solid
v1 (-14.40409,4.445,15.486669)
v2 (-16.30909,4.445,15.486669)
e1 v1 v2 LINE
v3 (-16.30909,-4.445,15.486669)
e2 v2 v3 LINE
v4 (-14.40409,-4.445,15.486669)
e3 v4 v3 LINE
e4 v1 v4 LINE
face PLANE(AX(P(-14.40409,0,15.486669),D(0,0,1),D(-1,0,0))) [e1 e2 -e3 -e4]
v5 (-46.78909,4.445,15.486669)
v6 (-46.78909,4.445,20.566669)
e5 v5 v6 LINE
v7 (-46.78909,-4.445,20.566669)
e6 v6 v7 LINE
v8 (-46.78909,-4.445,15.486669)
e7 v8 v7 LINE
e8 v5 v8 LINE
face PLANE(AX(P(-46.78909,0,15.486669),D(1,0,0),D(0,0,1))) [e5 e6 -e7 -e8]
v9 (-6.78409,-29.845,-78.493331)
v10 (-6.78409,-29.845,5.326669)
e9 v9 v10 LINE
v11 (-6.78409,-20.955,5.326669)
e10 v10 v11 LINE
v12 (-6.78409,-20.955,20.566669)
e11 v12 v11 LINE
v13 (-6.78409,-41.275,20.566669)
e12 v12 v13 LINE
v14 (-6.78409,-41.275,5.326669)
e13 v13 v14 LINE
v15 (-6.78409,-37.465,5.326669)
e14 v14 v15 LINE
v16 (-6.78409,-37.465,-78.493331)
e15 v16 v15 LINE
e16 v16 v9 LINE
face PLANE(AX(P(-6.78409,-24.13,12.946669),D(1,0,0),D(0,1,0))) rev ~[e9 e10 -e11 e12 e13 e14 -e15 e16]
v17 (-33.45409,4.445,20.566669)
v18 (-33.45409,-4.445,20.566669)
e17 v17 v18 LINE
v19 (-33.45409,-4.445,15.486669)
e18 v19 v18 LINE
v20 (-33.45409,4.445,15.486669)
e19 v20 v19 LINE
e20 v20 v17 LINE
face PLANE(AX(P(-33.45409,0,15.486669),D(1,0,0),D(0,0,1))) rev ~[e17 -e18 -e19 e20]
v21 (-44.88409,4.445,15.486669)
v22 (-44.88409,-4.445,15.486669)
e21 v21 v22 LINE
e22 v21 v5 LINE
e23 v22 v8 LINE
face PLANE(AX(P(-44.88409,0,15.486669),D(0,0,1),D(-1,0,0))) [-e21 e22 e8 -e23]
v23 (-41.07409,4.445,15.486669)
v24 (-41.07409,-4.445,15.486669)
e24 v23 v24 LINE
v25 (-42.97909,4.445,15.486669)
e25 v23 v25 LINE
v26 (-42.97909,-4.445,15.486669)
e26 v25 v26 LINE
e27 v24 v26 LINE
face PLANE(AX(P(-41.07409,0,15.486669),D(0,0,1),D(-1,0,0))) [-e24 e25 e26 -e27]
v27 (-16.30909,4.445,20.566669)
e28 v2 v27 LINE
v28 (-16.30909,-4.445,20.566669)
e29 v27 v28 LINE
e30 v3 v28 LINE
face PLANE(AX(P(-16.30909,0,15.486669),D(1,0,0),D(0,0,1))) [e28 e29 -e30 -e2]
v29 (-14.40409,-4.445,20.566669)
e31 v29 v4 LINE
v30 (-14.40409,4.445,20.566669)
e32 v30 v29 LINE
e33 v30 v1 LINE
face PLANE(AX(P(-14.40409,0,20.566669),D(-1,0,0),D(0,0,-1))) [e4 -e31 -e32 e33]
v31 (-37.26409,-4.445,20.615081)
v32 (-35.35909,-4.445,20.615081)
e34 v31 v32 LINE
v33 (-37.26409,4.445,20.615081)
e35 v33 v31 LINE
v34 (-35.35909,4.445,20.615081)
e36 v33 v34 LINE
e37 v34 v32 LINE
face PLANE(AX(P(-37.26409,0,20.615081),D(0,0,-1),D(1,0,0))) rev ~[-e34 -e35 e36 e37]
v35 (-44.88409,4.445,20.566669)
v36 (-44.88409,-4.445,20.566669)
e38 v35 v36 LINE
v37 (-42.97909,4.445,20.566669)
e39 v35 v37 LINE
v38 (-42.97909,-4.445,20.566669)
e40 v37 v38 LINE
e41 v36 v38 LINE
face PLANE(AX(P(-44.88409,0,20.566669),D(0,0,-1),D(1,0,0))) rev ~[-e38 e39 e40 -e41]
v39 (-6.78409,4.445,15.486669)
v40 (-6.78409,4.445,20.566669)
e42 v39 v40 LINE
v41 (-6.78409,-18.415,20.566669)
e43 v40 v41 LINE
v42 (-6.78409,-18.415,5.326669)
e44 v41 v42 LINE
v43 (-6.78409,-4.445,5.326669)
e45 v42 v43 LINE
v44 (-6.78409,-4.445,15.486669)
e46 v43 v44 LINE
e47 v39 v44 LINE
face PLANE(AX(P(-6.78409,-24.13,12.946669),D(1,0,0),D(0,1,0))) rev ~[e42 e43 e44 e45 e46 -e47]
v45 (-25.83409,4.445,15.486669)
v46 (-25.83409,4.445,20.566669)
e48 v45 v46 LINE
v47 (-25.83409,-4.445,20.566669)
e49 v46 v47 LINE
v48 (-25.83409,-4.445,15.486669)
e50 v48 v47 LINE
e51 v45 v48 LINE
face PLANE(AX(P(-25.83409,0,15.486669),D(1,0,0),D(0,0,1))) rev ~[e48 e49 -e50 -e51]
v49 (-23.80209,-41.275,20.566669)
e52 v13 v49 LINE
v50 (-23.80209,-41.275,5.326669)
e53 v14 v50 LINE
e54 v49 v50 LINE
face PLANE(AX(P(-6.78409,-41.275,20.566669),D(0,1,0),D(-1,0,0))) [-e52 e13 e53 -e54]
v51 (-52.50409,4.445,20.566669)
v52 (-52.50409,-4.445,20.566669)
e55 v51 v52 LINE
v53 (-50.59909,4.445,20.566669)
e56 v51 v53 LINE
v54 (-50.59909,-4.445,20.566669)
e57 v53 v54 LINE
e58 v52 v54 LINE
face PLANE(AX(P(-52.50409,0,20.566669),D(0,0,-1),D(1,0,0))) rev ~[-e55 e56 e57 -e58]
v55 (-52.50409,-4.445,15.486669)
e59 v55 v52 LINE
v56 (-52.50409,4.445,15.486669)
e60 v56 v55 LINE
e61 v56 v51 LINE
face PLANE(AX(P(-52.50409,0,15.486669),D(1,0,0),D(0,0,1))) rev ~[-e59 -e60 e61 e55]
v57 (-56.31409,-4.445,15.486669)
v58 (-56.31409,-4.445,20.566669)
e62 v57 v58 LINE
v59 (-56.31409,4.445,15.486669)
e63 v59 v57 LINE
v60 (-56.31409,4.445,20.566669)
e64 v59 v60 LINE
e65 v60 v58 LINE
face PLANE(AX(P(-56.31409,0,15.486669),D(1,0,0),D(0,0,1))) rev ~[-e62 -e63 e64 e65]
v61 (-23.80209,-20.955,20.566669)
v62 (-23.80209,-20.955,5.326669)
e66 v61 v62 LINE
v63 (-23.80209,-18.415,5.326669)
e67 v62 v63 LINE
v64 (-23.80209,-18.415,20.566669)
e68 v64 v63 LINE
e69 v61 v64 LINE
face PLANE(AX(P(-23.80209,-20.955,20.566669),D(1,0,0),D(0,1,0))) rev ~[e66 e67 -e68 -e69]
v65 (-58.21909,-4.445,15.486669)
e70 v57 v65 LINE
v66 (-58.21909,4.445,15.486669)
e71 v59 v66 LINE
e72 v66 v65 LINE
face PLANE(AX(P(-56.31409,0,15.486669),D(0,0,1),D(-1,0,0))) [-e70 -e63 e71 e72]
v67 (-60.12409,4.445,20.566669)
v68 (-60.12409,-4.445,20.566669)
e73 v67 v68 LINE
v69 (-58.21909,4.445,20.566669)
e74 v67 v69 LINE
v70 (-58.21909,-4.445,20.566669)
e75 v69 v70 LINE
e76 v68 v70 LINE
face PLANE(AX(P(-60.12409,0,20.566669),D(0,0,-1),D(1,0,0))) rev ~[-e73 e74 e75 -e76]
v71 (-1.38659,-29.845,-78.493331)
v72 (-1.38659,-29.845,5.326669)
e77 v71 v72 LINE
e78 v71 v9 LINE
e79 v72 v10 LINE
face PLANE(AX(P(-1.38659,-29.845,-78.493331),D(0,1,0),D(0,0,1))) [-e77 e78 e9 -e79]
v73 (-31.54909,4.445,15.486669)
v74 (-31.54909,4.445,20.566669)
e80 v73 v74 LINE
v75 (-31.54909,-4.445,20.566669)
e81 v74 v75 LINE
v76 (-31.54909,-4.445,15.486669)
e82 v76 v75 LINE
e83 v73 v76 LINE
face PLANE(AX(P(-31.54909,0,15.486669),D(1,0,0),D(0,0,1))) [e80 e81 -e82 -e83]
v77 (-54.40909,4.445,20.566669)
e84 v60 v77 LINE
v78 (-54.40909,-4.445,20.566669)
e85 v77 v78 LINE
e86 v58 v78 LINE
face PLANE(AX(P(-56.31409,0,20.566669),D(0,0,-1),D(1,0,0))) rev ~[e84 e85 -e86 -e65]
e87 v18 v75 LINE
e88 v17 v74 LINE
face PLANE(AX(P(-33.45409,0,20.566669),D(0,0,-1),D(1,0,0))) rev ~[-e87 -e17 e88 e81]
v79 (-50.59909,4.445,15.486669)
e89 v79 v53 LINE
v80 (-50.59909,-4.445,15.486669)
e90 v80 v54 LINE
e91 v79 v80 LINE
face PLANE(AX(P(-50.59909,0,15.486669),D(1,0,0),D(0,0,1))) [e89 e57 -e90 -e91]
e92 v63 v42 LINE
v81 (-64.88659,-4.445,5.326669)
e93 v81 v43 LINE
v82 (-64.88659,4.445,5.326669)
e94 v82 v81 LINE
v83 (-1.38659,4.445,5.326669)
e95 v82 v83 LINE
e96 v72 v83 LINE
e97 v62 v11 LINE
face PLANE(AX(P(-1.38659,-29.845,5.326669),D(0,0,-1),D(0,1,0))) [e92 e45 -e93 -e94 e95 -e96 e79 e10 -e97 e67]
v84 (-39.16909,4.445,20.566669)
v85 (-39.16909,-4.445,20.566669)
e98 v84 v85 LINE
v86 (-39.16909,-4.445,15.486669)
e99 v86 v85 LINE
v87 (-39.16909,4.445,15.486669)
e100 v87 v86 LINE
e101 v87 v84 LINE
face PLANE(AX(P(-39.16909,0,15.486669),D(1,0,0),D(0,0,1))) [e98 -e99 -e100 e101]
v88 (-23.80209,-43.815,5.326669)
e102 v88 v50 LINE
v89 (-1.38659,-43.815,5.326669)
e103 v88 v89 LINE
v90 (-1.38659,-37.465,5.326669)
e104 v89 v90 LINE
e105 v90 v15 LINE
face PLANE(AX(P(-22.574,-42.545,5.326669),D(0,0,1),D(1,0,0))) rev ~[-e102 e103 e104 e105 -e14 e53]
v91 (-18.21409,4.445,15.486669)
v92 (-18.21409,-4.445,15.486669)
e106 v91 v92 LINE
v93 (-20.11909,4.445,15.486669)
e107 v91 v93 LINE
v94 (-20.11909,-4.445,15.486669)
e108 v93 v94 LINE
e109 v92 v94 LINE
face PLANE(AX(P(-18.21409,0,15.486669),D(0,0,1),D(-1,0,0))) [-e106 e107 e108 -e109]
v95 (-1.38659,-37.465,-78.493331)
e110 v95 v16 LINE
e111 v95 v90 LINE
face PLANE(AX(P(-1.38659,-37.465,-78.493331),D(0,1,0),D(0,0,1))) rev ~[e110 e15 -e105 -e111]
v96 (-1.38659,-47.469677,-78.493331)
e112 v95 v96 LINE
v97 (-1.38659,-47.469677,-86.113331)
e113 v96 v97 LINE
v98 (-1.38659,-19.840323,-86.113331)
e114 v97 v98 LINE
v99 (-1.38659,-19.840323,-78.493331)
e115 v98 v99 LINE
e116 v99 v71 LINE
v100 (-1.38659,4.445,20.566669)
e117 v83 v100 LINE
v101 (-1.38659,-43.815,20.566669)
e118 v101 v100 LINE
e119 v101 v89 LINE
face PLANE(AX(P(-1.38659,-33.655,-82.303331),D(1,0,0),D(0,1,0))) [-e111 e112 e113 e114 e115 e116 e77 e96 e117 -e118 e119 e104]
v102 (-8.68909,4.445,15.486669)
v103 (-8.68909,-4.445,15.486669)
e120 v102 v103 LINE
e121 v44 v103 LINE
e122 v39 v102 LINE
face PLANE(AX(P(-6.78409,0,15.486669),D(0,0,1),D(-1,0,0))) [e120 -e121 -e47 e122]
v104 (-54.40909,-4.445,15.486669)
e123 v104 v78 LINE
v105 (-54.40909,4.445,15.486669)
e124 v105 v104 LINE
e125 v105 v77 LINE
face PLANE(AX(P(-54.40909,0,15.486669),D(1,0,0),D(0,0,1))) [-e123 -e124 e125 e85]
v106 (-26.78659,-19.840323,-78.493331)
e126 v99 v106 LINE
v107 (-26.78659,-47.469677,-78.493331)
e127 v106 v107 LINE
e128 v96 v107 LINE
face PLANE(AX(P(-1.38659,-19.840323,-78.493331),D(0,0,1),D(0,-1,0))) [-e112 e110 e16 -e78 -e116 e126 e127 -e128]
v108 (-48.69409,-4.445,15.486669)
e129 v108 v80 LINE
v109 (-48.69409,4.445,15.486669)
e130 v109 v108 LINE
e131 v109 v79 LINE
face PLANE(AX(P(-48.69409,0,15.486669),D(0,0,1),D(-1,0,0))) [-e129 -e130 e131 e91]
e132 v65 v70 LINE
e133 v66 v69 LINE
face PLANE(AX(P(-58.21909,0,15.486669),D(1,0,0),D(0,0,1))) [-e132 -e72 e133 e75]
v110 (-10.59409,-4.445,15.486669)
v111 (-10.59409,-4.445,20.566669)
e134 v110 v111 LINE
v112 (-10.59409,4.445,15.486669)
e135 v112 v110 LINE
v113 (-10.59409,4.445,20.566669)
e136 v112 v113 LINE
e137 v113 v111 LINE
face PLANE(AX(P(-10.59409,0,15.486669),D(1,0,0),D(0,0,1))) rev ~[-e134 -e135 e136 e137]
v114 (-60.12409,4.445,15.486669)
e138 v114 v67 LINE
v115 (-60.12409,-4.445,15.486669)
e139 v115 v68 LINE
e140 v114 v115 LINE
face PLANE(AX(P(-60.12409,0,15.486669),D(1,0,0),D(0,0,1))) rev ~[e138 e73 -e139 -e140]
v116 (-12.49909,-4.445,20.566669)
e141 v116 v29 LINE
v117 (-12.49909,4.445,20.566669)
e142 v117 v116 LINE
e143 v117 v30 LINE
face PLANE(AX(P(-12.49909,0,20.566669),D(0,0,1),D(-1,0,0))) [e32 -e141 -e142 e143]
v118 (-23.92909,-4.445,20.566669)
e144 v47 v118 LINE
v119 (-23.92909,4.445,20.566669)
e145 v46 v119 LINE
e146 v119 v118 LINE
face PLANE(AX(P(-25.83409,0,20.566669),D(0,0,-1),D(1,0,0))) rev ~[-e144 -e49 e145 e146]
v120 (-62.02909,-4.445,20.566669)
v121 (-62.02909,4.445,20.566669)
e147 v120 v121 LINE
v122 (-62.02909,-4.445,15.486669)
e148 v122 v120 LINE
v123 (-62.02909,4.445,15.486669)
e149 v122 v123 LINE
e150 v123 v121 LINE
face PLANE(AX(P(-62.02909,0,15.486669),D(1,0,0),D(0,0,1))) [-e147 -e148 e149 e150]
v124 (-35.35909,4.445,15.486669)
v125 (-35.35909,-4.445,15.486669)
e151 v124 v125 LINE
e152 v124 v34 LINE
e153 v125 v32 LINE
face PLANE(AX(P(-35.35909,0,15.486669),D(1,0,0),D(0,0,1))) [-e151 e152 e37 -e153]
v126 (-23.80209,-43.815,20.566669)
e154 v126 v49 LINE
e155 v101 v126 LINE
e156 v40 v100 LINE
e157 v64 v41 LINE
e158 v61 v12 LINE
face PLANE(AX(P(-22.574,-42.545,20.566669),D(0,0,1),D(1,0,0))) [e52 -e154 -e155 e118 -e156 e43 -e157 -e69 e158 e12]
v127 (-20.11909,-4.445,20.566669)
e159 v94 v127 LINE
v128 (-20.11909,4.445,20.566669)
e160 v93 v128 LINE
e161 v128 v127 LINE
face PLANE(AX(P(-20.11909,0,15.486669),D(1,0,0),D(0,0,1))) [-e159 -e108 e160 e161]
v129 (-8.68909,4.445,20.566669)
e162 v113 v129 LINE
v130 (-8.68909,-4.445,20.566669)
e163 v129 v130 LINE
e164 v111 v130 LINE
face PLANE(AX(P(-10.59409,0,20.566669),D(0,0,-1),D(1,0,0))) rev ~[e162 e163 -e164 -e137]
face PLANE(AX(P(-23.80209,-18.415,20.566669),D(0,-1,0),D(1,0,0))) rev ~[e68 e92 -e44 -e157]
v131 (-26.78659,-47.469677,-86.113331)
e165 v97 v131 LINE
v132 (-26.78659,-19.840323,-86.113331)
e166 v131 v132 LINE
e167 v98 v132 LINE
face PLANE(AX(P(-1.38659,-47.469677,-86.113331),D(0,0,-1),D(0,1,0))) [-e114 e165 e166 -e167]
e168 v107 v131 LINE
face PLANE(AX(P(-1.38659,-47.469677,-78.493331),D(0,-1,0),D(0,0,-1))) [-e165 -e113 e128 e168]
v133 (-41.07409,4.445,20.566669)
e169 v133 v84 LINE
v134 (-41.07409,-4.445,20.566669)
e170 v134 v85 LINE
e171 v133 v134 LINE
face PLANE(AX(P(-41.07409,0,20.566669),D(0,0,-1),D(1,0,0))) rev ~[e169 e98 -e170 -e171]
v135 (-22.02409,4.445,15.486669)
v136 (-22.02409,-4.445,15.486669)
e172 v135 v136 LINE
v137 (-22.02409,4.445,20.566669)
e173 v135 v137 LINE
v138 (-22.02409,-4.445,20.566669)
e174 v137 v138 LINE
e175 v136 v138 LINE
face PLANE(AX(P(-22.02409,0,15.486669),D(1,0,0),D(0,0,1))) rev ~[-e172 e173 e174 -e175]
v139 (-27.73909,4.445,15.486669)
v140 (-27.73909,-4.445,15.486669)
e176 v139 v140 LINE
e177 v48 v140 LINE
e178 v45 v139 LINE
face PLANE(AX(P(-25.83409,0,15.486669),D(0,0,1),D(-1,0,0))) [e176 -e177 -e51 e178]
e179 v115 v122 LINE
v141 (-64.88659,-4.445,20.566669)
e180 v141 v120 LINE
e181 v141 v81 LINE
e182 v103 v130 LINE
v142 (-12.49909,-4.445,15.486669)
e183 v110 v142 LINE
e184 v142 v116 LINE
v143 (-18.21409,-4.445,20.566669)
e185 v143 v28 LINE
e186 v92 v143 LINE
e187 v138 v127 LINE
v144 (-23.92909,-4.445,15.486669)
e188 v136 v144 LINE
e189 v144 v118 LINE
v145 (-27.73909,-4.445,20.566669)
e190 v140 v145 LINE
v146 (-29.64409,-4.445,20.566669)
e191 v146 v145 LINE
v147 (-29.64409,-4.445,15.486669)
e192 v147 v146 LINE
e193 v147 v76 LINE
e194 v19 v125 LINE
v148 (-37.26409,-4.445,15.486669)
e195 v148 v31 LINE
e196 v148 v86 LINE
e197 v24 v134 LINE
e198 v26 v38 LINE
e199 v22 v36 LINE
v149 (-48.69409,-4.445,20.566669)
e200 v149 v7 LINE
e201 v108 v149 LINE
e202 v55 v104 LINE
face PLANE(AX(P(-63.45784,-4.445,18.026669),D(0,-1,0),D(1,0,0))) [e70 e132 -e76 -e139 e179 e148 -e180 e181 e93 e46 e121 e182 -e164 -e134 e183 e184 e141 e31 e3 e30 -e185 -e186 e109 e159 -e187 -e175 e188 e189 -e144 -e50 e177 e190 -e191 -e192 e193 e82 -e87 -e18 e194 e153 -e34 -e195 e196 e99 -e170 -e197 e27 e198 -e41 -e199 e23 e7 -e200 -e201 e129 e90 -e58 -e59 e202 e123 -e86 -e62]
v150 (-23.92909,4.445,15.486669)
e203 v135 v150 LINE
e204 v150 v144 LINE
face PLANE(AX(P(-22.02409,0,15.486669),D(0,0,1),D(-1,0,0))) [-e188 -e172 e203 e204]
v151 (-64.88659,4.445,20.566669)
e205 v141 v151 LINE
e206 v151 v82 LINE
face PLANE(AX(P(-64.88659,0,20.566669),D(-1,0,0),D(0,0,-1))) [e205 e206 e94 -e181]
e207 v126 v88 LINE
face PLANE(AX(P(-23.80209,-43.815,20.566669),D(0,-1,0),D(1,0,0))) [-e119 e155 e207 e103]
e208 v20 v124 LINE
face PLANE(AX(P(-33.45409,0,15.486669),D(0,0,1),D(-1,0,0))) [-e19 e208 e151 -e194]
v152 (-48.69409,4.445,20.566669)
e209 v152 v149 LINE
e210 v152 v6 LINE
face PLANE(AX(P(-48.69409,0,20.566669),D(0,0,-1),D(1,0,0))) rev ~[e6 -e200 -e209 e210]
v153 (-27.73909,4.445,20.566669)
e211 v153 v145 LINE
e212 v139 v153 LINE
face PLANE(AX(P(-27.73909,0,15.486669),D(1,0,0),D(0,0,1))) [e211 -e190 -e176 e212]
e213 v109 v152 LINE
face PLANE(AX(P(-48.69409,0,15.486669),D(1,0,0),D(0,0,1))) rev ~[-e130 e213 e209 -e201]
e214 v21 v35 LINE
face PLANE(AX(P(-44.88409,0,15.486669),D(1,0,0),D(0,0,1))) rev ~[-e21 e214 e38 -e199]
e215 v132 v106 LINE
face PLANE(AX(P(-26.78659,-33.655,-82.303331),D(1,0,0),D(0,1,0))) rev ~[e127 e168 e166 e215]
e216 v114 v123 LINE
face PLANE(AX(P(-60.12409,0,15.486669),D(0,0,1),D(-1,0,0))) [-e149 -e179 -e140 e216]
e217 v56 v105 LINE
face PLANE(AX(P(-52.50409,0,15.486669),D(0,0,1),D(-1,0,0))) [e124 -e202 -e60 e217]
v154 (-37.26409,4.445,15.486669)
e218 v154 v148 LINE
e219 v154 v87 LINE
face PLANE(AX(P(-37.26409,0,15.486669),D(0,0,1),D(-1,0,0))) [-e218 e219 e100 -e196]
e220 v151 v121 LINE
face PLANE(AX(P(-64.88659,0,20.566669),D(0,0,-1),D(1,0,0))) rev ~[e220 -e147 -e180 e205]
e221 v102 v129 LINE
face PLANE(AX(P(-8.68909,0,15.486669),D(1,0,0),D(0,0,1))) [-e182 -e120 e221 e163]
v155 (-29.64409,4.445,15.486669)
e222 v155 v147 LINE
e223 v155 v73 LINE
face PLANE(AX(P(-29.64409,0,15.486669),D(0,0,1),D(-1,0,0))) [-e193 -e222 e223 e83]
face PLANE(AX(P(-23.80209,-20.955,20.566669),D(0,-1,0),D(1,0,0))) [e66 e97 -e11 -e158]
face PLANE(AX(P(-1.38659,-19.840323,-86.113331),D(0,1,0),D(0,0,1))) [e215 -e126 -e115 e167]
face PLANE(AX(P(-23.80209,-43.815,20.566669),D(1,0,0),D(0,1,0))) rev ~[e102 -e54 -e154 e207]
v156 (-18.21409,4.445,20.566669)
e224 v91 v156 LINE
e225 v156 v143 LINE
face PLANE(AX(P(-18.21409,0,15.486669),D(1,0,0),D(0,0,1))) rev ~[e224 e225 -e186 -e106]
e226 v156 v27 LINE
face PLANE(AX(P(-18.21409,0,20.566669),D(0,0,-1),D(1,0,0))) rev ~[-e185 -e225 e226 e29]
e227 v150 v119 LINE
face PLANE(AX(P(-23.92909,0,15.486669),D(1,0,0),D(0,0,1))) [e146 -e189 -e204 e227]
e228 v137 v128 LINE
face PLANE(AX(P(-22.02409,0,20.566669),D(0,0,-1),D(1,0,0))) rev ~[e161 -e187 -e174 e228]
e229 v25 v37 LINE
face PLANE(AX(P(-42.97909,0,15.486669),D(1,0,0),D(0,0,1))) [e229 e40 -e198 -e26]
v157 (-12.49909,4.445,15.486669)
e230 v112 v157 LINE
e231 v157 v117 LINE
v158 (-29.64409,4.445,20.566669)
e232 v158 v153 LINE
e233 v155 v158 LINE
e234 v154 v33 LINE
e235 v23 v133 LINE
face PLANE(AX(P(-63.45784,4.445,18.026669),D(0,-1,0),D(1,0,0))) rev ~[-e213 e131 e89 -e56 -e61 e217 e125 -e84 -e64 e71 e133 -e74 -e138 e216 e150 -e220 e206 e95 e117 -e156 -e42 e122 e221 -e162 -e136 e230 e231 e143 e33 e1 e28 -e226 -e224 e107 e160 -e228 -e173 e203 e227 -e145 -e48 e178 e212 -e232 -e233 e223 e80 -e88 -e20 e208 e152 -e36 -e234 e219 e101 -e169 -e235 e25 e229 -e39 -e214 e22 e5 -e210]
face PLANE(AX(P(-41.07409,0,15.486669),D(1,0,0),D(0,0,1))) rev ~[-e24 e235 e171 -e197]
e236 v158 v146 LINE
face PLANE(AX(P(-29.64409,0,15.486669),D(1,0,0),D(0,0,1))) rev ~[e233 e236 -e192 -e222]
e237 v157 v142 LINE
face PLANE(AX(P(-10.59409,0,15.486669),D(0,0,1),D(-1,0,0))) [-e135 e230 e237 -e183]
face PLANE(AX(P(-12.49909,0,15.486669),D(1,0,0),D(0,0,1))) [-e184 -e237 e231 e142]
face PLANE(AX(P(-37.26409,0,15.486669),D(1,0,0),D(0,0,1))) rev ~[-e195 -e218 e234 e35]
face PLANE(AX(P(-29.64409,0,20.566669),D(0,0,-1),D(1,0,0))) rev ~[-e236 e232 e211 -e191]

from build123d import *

# Parameters (mm, degrees)
F0_W     = 2.8575
F0_H     = 5.08
F0_W_2   = 1.905
F0_W_3   = 5.3975
F0_H_2   = 5.128411484
F1_DEPTH = 4.445
F2_W     = 7.62
F2_H     = 83.82
F3_DEPTH = 5.3975
F4_W     = 17.018
F4_H     = 2.54
F4_W_2   = 2.45618
F4_W_3   = 14.56182
F5_DEPTH = 15.24
F6_DEPTH = 25.4


# Not quite as in the source:
# - a feature names something its author has since deleted; it is built from what else it names


with BuildPart() as f1:
    # F0 (on Front) → F1 (new body, symmetric)
    with BuildSketch(Plane.XZ):
        with Locations((-63.4578398415, 18.0266693214)):
            Rectangle(F0_W, F0_H)
        Polygon((-62.0290898415, 15.4866693214), (-64.8865898415, 15.4866693214), (-64.8865898415, 5.3266693214), (-1.3865898415, 5.3266693214), (-1.3865898415, 15.4866693214), (-6.7840898415, 15.4866693214), (-8.6890898415, 15.4866693214), (-10.5940898415, 15.4866693214), (-12.4990898415, 15.4866693214), (-13.314443469, 15.4866693214), (-14.4040898415, 15.4866693214), (-16.3090898415, 15.4866693214), (-18.2140898415, 15.4866693214), (-20.1190898415, 15.4866693214), (-22.0240898415, 15.4866693214), (-23.9290898415, 15.4866693214), (-25.8340898415, 15.4866693214), (-27.7390898415, 15.4866693214), (-29.6440898415, 15.4866693214), (-31.5490898415, 15.4866693214), (-33.4540898415, 15.4866693214), (-35.3590898415, 15.4866693214), (-37.2640898415, 15.4866693214), (-39.1690898415, 15.4866693214), (-41.0740898415, 15.4866693214), (-42.9790898415, 15.4866693214), (-44.8840898415, 15.4866693214), (-46.7890898415, 15.4866693214), (-48.6940898415, 15.4866693214), (-50.5990898415, 15.4866693214), (-52.5040898415, 15.4866693214), (-54.4090898415, 15.4866693214), (-56.3140898415, 15.4866693214), (-58.2190898415, 15.4866693214), (-60.1240898415, 15.4866693214), align=None)
        with Locations((-59.1715898415, 18.0266693214)):
            Rectangle(F0_W_2, F0_H)
        with Locations((-4.0853398415, 18.0266693214)):
            Rectangle(F0_W_3, F0_H)
        with Locations((-55.3615898415, 18.0266693214)):
            Rectangle(F0_W_2, F0_H)
        with Locations((-9.6415898415, 18.0266693214)):
            Rectangle(F0_W_2, F0_H)
        with Locations((-51.5515898415, 18.0266693214)):
            Rectangle(F0_W_2, F0_H)
        Polygon((-13.314443469, 15.4866693214), (-12.4990898415, 15.4866693214), (-12.4990898415, 20.5666693214), (-13.314443469, 20.5666693214), (-14.4040898415, 20.5666693214), (-14.4040898415, 15.4866693214), align=None)
        with Locations((-47.7415898415, 18.0266693214)):
            Rectangle(F0_W_2, F0_H)
        with Locations((-43.9315898415, 18.0266693214)):
            Rectangle(F0_W_2, F0_H)
        with Locations((-17.2615898415, 18.0266693214)):
            Rectangle(F0_W_2, F0_H)
        with Locations((-40.1215898415, 18.0266693214)):
            Rectangle(F0_W_2, F0_H)
        with Locations((-21.0715898415, 18.0266693214)):
            Rectangle(F0_W_2, F0_H)
        with Locations((-36.3115898415, 18.0508750634)):
            Rectangle(F0_W_2, F0_H_2)
        with Locations((-24.8815898415, 18.0266693214)):
            Rectangle(F0_W_2, F0_H)
        with Locations((-32.5015898415, 18.0266693214)):
            Rectangle(F0_W_2, F0_H)
        with Locations((-28.6915898415, 18.0266693214)):
            Rectangle(F0_W_2, F0_H)
    extrude(amount=F1_DEPTH, both=True)

    # F2 (on face) → F3 (join)
    with BuildSketch(Plane.YZ.offset(-1.3865898415)):
        Polygon((-4.445, 5.3266693214), (-4.445, 20.5666693214), (-43.815, 20.5666693214), (-43.815, 5.3266693214), (-37.465, 5.3266693214), (-29.845, 5.3266693214), align=None)
        with Locations((-33.655, -36.5833306786)):
            Rectangle(F2_W, F2_H)
    extrude(amount=-F3_DEPTH)

    # F4 (on face) → F5 (join)
    with BuildSketch(Plane.XY.offset(20.5666693214)):
        with Locations((-15.2930898415, -19.685)):
            Rectangle(F4_W, F4_H)
        with Locations((-22.5739998415, -42.545)):
            Rectangle(F4_W_2, F4_H)
        with Locations((-14.0649998415, -42.545)):
            Rectangle(F4_W_3, F4_H)
    extrude(amount=-F5_DEPTH)

    # F2 (on face) → F6 (join)
    with BuildSketch(Plane.YZ.offset(-1.3865898415)):
        Polygon((-19.840323447, -78.4933306786), (-29.845, -78.4933306786), (-37.465, -78.4933306786), (-47.469676553, -78.4933306786), (-47.469676553, -86.1133306786), (-19.840323447, -86.1133306786), align=None)
    extrude(amount=-F6_DEPTH)


solid = f1.part
